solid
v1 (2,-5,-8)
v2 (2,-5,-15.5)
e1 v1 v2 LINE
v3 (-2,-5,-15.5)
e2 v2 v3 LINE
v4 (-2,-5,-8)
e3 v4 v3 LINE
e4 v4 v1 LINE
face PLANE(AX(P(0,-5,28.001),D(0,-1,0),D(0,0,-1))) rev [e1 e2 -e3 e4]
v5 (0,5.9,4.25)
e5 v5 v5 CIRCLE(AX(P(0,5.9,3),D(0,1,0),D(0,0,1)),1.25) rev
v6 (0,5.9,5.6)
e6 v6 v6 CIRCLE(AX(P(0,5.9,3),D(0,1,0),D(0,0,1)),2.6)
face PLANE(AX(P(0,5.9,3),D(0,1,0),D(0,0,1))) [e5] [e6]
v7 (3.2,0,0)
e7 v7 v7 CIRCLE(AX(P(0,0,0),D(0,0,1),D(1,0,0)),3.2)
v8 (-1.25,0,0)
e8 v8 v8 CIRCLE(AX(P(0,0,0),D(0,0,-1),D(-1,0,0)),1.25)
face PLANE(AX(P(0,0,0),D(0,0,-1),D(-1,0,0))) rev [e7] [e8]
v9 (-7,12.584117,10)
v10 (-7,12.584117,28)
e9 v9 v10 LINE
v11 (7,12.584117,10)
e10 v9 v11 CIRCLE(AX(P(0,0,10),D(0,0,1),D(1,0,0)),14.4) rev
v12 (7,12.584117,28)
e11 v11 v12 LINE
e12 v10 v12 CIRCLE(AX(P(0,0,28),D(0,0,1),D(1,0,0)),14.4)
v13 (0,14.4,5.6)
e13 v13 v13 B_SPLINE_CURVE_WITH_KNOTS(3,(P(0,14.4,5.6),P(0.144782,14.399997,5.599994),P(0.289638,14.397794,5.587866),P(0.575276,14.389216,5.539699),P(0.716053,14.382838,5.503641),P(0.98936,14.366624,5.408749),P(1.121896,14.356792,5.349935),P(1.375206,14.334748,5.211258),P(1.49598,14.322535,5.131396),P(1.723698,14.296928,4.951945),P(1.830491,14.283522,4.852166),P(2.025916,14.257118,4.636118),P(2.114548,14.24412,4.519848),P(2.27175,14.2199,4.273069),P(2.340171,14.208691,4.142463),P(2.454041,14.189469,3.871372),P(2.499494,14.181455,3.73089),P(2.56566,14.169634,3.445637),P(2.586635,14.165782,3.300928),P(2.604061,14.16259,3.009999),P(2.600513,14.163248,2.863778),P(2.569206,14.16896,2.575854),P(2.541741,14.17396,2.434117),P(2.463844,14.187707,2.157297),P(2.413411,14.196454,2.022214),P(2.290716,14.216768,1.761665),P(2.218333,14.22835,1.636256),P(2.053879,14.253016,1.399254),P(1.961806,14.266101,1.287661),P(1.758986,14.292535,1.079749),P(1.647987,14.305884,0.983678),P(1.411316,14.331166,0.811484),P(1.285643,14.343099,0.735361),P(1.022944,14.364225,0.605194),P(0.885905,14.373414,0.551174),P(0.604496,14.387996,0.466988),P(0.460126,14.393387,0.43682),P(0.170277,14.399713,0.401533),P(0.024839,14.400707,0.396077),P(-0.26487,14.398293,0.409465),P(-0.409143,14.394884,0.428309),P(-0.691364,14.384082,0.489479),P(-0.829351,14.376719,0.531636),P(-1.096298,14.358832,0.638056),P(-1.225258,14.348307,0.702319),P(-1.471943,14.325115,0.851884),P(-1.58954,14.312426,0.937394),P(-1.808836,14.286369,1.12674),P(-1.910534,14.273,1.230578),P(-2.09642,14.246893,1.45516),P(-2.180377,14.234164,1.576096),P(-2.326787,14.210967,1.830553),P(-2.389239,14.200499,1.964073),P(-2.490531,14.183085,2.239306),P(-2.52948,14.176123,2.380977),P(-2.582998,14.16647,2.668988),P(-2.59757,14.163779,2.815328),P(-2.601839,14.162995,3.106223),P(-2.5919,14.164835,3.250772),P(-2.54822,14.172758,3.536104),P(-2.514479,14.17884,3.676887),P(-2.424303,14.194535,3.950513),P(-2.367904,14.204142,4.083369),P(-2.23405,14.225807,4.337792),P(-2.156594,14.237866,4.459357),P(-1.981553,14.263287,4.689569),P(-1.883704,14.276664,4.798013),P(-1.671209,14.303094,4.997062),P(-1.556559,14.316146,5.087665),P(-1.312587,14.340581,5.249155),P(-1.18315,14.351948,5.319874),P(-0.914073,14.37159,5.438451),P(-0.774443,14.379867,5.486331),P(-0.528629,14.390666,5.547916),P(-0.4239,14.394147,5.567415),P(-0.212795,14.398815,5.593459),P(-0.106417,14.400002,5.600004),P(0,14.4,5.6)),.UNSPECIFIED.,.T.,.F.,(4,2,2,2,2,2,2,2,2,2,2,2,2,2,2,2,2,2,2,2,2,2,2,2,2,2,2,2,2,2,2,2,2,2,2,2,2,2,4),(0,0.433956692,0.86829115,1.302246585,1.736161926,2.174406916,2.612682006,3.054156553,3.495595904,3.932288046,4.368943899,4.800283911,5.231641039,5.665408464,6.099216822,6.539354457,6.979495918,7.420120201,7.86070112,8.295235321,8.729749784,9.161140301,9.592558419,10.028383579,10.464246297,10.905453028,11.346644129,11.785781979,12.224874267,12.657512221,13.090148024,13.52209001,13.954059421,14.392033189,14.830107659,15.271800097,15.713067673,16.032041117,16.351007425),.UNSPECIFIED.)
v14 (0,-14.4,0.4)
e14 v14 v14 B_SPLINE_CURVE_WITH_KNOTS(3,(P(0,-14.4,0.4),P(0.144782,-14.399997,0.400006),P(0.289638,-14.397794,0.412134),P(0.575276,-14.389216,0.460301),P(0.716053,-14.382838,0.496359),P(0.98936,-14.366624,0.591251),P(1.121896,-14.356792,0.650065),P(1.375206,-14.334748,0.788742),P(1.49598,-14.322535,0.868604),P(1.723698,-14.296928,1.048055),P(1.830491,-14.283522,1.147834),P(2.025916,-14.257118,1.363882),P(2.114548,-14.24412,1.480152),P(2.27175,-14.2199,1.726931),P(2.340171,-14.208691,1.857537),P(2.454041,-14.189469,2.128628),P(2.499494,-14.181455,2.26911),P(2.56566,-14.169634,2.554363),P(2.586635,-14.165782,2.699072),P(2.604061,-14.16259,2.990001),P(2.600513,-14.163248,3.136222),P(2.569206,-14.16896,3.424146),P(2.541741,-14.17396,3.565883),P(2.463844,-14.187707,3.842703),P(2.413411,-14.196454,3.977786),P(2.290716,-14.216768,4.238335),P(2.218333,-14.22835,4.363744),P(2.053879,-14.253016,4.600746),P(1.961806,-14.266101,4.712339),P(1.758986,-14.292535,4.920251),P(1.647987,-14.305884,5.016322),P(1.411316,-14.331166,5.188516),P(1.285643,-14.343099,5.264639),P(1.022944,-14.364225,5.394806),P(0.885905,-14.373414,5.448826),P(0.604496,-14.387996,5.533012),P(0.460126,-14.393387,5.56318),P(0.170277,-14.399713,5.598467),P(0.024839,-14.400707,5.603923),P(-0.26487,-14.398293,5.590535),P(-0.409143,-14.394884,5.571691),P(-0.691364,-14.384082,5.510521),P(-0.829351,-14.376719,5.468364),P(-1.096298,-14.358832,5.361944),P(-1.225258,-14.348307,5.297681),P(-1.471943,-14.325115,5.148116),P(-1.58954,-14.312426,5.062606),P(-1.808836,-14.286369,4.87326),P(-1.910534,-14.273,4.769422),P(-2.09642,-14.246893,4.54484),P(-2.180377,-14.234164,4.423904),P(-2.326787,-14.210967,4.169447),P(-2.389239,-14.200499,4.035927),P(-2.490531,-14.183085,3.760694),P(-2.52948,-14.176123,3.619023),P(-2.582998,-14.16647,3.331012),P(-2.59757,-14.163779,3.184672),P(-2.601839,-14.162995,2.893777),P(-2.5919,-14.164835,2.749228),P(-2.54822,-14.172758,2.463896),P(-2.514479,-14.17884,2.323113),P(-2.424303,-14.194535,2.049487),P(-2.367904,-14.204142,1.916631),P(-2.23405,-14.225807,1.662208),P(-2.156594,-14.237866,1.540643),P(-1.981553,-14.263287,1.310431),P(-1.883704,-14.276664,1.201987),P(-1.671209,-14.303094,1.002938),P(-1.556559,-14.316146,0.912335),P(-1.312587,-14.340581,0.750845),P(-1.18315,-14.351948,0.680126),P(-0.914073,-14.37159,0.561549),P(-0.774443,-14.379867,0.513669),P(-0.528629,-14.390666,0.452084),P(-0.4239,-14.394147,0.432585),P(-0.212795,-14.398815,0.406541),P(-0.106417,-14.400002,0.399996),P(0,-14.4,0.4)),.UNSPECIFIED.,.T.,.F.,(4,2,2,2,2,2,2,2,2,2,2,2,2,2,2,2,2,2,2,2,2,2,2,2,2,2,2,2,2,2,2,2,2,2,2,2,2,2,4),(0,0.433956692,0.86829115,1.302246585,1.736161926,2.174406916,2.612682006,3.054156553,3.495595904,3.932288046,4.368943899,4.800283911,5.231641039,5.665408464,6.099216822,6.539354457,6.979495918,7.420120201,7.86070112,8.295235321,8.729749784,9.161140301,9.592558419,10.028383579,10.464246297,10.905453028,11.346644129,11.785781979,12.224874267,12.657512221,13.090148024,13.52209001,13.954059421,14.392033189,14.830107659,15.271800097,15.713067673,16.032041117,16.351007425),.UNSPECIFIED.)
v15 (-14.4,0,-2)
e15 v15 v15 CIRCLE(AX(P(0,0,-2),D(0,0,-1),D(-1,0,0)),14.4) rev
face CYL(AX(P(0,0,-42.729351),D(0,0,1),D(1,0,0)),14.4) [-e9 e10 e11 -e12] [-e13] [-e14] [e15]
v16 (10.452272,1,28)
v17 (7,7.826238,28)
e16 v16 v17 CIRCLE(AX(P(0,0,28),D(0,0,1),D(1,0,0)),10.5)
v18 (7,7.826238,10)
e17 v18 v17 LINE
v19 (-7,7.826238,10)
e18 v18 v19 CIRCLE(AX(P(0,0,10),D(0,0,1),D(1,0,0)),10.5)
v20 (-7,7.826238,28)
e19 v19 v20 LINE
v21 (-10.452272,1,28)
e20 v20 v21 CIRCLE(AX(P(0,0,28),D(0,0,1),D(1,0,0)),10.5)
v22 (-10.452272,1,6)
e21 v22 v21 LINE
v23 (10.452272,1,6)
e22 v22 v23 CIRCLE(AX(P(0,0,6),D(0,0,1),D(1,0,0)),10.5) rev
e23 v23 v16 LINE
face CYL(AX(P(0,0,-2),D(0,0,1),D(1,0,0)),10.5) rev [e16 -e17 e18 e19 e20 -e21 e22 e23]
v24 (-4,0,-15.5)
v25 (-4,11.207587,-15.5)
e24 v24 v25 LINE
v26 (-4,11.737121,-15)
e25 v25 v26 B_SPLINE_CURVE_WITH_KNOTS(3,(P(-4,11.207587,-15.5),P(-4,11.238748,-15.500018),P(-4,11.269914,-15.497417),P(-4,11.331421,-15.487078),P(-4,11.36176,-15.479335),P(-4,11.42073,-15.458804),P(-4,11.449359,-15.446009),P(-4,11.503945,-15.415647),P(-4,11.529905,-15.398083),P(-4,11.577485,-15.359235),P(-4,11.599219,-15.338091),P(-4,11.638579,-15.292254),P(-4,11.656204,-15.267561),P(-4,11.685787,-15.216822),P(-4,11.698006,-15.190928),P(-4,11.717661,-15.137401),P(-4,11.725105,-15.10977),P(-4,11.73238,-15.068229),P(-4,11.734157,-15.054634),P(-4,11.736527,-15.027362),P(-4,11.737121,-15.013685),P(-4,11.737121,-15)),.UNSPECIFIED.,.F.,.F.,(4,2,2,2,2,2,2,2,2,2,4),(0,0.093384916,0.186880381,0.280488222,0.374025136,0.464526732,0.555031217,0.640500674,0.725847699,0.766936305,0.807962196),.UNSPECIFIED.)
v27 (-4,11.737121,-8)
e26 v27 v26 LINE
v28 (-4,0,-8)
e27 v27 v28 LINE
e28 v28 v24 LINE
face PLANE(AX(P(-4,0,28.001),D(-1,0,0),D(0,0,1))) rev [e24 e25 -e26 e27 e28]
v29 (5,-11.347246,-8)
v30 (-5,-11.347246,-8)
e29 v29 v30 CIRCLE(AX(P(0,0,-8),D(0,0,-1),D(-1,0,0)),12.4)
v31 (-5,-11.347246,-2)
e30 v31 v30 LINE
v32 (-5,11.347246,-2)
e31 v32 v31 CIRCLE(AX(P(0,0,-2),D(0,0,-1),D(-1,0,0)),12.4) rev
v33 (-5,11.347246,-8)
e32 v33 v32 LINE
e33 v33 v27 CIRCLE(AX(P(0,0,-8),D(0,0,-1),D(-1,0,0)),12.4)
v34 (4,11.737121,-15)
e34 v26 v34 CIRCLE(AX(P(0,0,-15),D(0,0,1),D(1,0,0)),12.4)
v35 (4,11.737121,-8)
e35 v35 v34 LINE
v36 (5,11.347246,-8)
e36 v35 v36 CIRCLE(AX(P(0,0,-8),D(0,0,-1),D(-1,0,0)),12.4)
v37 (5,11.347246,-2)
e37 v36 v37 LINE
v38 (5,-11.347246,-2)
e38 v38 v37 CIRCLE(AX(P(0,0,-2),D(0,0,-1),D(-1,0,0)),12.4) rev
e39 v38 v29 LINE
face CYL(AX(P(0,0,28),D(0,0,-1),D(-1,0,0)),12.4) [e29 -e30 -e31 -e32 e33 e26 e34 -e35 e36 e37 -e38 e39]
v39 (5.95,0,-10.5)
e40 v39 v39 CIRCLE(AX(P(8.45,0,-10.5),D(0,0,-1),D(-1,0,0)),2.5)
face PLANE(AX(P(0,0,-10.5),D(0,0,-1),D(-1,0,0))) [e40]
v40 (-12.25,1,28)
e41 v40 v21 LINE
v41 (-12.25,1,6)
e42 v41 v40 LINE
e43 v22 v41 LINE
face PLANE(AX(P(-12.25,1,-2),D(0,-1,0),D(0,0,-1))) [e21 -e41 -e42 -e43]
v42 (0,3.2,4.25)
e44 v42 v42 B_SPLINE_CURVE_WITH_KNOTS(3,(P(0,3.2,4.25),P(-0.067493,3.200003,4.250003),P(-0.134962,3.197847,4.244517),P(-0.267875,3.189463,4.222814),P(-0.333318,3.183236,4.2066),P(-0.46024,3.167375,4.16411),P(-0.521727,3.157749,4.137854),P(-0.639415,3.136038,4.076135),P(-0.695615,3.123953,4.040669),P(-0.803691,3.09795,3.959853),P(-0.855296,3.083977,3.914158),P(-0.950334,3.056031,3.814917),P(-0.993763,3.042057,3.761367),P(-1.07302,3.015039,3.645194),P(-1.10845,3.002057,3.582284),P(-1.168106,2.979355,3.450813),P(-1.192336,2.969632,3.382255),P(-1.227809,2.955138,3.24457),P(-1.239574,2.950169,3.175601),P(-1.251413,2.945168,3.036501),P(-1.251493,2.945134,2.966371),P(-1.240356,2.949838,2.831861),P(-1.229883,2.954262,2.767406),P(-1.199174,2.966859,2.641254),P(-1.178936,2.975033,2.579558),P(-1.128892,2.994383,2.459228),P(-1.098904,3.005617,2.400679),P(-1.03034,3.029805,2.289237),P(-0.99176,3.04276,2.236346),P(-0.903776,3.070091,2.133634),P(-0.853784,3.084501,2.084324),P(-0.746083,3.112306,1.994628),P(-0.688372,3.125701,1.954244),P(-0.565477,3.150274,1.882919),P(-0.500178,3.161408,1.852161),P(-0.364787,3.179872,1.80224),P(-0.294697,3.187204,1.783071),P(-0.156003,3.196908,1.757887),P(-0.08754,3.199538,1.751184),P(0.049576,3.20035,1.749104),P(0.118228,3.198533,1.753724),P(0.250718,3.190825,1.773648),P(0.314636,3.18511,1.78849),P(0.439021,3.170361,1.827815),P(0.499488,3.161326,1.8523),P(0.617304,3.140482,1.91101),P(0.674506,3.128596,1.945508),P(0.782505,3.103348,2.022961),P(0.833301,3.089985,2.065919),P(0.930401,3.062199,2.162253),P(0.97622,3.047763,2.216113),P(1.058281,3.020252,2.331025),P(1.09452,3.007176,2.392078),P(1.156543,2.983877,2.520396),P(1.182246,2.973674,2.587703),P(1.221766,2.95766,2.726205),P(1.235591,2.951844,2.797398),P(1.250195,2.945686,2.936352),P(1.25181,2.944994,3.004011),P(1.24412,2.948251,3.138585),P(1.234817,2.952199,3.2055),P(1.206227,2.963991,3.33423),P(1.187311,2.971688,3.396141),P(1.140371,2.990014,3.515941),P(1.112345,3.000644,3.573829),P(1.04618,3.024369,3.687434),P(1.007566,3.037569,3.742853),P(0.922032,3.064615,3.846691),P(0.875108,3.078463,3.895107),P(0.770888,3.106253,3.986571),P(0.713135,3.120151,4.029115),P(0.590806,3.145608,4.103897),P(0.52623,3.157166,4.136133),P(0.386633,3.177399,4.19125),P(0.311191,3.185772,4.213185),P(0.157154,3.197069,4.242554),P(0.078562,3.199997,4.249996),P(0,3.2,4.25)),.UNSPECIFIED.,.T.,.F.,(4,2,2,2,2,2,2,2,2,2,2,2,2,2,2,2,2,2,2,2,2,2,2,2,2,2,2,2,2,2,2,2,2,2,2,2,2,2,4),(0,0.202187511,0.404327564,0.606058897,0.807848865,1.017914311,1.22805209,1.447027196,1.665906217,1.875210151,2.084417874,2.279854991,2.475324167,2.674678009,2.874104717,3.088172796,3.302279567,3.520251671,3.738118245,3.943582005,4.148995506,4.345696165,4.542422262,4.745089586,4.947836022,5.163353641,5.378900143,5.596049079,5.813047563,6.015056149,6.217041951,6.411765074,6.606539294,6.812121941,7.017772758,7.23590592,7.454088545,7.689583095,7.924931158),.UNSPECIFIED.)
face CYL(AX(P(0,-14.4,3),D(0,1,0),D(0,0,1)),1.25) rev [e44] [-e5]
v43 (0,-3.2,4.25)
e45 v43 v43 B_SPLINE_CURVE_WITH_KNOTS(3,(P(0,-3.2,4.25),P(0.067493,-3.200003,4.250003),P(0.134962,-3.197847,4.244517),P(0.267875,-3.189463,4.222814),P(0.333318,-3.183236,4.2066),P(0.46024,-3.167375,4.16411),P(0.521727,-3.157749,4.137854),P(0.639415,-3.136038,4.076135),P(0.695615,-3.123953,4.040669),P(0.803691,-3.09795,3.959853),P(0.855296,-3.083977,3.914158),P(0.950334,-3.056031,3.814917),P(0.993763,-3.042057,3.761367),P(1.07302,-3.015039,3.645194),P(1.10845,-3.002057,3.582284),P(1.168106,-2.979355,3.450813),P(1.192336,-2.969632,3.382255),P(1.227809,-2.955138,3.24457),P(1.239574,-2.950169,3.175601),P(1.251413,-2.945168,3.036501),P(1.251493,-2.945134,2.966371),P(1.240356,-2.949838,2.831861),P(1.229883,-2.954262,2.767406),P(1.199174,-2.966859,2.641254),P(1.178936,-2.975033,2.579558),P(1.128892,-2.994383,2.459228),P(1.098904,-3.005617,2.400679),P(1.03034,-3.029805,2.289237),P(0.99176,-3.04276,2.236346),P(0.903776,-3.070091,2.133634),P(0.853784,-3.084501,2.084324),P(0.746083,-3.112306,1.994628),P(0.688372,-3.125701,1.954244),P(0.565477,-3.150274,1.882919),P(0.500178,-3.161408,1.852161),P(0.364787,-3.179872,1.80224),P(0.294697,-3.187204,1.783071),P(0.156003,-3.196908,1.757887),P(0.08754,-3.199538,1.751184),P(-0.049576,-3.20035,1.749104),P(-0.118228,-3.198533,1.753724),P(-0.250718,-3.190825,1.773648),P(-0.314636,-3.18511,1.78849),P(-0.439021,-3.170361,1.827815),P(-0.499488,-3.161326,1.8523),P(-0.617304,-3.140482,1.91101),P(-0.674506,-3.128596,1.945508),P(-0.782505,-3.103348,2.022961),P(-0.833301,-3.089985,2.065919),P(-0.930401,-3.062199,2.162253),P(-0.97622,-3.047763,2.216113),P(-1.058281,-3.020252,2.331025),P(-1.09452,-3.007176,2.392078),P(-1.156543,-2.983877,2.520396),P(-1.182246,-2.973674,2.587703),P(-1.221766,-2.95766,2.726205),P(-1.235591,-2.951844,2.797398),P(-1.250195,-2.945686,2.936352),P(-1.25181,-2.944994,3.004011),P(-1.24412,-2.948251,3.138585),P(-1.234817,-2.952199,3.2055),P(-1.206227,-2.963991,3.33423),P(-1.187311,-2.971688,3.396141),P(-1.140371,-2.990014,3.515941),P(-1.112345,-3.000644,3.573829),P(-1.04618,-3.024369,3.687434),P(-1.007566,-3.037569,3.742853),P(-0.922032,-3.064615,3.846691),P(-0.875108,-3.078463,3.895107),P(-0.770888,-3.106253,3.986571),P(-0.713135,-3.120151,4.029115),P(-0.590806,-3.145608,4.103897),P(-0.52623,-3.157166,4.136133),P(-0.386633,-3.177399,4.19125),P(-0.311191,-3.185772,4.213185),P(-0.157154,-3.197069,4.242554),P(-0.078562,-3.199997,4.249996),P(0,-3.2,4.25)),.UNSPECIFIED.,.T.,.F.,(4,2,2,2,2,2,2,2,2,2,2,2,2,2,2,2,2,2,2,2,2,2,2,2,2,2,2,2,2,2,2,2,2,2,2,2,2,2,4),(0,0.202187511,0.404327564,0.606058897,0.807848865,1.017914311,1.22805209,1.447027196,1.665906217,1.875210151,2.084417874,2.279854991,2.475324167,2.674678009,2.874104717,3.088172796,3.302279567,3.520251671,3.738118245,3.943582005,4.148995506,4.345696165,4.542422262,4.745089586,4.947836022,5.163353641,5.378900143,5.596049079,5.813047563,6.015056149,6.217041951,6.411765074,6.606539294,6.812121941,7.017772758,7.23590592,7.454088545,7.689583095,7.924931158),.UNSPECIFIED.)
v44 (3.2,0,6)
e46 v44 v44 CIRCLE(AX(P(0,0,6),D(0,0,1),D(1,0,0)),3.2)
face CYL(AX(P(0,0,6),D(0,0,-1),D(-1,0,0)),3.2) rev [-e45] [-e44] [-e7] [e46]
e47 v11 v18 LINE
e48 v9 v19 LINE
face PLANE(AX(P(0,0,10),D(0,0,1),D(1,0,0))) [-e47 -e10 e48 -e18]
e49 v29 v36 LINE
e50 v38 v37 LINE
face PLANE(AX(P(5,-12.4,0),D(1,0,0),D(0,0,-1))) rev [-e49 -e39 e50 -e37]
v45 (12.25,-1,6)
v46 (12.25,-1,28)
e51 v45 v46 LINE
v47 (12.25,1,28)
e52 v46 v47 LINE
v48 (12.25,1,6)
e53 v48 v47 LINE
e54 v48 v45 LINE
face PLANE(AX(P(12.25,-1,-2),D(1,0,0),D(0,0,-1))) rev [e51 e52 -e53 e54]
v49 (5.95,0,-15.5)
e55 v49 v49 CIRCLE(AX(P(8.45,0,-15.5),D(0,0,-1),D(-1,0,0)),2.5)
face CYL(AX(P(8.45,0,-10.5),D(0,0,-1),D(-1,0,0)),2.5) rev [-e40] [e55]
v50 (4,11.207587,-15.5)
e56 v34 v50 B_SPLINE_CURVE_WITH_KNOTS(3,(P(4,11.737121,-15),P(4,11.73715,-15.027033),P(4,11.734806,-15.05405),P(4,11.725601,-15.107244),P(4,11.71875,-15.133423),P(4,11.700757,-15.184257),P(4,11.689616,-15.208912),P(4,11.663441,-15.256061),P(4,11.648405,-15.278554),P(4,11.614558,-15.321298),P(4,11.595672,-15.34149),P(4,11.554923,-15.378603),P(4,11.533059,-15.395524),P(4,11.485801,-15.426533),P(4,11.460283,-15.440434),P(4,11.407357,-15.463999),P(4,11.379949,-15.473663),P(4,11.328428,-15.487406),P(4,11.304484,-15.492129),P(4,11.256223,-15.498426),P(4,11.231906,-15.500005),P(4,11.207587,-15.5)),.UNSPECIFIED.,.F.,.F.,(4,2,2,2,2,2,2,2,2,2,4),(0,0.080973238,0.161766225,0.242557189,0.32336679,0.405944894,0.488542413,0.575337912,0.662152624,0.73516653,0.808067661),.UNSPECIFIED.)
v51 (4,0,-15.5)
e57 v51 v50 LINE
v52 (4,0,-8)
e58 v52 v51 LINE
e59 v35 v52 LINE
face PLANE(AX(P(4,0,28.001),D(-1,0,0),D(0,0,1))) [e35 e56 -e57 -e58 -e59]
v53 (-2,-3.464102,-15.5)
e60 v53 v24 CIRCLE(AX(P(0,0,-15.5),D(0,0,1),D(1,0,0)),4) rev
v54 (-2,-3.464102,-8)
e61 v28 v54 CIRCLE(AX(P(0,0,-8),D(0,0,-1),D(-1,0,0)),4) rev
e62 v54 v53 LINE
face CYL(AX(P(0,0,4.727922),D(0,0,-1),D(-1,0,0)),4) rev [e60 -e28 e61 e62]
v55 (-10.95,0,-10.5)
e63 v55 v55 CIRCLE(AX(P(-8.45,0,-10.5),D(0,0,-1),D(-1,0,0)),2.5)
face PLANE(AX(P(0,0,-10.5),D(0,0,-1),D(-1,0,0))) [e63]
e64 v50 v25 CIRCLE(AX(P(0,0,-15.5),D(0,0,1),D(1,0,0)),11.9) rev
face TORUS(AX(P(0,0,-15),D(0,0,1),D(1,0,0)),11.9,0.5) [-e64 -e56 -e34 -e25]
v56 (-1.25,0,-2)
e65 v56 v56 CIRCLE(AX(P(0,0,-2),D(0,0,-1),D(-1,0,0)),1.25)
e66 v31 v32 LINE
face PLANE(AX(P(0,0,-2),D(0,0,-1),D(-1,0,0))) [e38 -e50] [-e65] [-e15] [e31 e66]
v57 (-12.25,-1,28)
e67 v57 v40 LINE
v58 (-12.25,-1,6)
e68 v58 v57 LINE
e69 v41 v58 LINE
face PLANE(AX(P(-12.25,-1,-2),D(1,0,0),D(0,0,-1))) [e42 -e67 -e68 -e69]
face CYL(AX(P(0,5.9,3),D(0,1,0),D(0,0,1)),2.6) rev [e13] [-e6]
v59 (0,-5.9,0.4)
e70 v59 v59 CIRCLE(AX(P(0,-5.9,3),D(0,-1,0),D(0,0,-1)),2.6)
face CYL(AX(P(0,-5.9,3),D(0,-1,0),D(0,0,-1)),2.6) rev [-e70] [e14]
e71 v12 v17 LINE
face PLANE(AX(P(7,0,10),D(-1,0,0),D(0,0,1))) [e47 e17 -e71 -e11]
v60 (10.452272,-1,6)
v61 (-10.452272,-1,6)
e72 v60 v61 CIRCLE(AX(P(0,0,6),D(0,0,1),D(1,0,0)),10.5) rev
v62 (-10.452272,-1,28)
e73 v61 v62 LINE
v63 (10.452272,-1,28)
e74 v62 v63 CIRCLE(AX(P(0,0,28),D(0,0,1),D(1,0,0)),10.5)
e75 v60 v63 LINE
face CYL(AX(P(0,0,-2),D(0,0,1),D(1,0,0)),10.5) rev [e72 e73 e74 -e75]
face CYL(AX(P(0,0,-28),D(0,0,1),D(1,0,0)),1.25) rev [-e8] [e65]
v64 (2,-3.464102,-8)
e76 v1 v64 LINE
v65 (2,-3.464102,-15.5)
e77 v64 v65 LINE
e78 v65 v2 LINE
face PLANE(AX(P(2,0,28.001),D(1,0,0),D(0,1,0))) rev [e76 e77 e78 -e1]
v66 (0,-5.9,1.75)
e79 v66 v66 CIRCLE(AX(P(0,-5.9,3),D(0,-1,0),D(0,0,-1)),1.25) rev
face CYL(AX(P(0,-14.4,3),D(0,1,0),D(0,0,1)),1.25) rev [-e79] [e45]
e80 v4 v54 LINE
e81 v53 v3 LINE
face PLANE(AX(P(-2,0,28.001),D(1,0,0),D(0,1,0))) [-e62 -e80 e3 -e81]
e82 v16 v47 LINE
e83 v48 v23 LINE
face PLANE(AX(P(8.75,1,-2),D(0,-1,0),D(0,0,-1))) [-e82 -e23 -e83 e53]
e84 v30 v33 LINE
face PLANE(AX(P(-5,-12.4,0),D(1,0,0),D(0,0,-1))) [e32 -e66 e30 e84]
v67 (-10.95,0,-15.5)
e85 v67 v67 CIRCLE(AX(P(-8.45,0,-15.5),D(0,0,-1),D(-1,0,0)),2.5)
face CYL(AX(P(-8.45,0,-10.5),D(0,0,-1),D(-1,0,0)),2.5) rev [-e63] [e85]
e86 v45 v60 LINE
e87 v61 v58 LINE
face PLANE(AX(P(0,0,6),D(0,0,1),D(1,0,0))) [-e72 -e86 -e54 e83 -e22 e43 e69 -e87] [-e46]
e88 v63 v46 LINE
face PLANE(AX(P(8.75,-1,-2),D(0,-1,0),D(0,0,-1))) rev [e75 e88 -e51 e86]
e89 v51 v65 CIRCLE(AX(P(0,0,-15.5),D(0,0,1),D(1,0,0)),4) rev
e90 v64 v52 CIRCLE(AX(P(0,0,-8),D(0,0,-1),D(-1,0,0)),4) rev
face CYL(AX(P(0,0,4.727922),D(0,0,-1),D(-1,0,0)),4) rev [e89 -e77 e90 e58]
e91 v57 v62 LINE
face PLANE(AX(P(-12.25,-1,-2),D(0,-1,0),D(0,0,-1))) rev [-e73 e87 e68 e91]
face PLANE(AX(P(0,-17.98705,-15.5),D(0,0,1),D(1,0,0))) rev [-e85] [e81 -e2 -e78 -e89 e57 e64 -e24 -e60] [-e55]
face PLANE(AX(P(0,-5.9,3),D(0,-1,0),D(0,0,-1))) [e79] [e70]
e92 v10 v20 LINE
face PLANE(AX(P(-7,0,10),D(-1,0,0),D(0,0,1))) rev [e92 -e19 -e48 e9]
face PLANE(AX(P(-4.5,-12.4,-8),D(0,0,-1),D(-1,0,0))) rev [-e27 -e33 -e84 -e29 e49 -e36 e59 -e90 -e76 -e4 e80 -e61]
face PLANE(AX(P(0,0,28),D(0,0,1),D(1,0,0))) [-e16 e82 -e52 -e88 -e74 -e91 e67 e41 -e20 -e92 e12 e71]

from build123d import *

# Parameters (mm, degrees)
SKETCH1_R                = 12.4
BOSS_EXTRUDE1_DEPTH      = 28
CUT_EXTRUDE1_DEPTH       = 30
SKETCH3_R                = 12.4
SKETCH3_R_2              = 3.2
BOSS_EXTRUDE2_DEPTH      = 6
CUT_EXTRUDE2_DEPTH       = 18
BOSS_EXTRUDE3_START      = 28
SKETCH5_R                = 12.4
BOSS_EXTRUDE3_DEPTH      = 28
SKETCH6_R                = 4.5
CUT_EXTRUDE3_DEPTH       = 26
CUT_EXTRUDE4_DEPTH       = 34.038159755
CUT_EXTRUDE4_DEPTH_BACK  = 34.038159755
SKETCH7_W                = 9
SKETCH7_H                = 6
CUT_EXTRUDE6_DEPTH       = 34.038159755
CUT_EXTRUDE6_DEPTH_BACK  = 34.038159755
SKETCH11_R               = 1.25
SKETCH12_R               = 4.5
SKETCH12_R_2             = 4
BOSS_EXTRUDE5_DEPTH      = 16
SKETCH13_R               = 18
SKETCH13_R_2             = 4.5
BOSS_EXTRUDE6_DEPTH      = 5
CUT_EXTRUDE7_DEPTH       = 12.5
FILLET1_R                = 0.4
CIRPATTERN1_COUNT        = 70
FILLET1_OF_CIRPATTERN1_R = 0.4
CUT_EXTRUDE10_DEPTH      = 38.835617555
CUT_EXTRUDE10_DEPTH_BACK = 38.835617555
SKETCH17_W               = 7.225305648
SKETCH17_H               = 12.5
SKETCH17_W_2             = 24.8
SKETCH17_W_3             = 7.005434177
CUT_EXTRUDE11_DEPTH      = 5
CUT_EXTRUDE12_DEPTH      = 34.038159755
CUT_EXTRUDE12_DEPTH_BACK = 34.038159755
SKETCH19_W               = 0.5
SKETCH19_H               = 6
SKETCH19_W_2             = 9
CUT_EXTRUDE13_REACH      = 48.902
BOSS_EXTRUDE7_START      = -30
BOSS_EXTRUDE7_OUTLINE_R  = 14.4
BOSS_EXTRUDE7_DEPTH      = 30
CUT_EXTRUDE14_START      = -18
CUT_EXTRUDE14_DEPTH      = 18
CUT_EXTRUDE15_DEPTH      = 35.622536013
CUT_EXTRUDE15_DEPTH_BACK = 35.622536013
SKETCH25_R               = 1.25
SKETCH26_R               = 2.6
CUT_EXTRUDE16_DEPTH      = 8.5
CUT_EXTRUDE17_START      = -8.5
SKETCH27_R               = 2.6
CUT_EXTRUDE17_DEPTH      = 8.5
FILLET2_R                = 0.5


# Read off the part's stored shape, not the designer's step: Boss-Extrude7
with BuildPart() as part:
    # Sketch1 → Boss-Extrude1 (new body)
    with BuildSketch(Plane.XY):
        Circle(SKETCH1_R)
    extrude(amount=BOSS_EXTRUDE1_DEPTH)

    # Sketch2 → Cut-Extrude1 (cut)
    with BuildSketch(Plane.XY.offset(28)):
        with BuildLine():
            ThreePointArc((10.45227248, 1), (0, 10.5), (-10.45227248, 1))
            Line((-10.45227248, 1), (-12.25, 1))
            Line((-12.25, 1), (-12.25, -1))
            Line((-12.25, -1), (-10.45227248, -1))
            ThreePointArc((-10.45227248, -1), (0, -10.5), (10.45227248, -1))
            Line((10.45227248, -1), (12.25, -1))
            Line((12.25, -1), (12.25, 1))
            Line((12.25, 1), (10.45227248, 1))
        make_face()
    extrude(amount=-CUT_EXTRUDE1_DEPTH, mode=Mode.SUBTRACT)

    # Sketch3 → Boss-Extrude2 (add)
    with BuildSketch(Plane.XY):
        Circle(SKETCH3_R)
        Circle(SKETCH3_R_2, mode=Mode.SUBTRACT)
    extrude(amount=BOSS_EXTRUDE2_DEPTH)

    # Sketch2<3> → Cut-Extrude2 (cut)
    with BuildSketch(Plane.XY.offset(28)):
        with BuildLine():
            Line((-7, 10.235233266), (-7, 7.826237921))
            ThreePointArc((-7, 7.826237921), (0, 10.5), (7, 7.826237921))
            Line((7, 7.826237921), (7, 10.235233266))
            ThreePointArc((7, 10.235233266), (0, 12.4), (-7, 10.235233266))
        make_face()
    extrude(amount=-CUT_EXTRUDE2_DEPTH, mode=Mode.SUBTRACT)

    # Sketch5 → Boss-Extrude3 (add)
    with BuildSketch(Plane(origin=(0, 0, 0), x_dir=(-1, 0, 0), z_dir=(0, 0, -1)).offset(BOSS_EXTRUDE3_START)):
        Circle(SKETCH5_R)
    extrude(amount=-BOSS_EXTRUDE3_DEPTH)

    # Sketch6 → Cut-Extrude3 (cut)
    with BuildSketch(Plane(origin=(0, 0, -28), x_dir=(-1, 0, 0), z_dir=(0, 0, -1))):
        Circle(SKETCH6_R)
    extrude(amount=-CUT_EXTRUDE3_DEPTH, mode=Mode.SUBTRACT)

    # Sketch7 → Cut-Extrude4 (cut, two sides: drawn at the far end of the back side and taken through both)
    with BuildSketch(Plane(origin=(0, 0, 0), x_dir=(1, 0, 0), z_dir=(0, 1, 0)).offset(-CUT_EXTRUDE4_DEPTH_BACK)):
        with Locations((0, 5)):
            Rectangle(SKETCH7_W, SKETCH7_H)
    extrude(amount=CUT_EXTRUDE4_DEPTH + CUT_EXTRUDE4_DEPTH_BACK, mode=Mode.SUBTRACT)

    # Sketch11 → Cut-Extrude6 (cut, two sides: drawn at the far end of the back side and taken through both)
    with BuildSketch(Plane.XY.offset(-CUT_EXTRUDE6_DEPTH_BACK)):
        with Locations(Location((0, 0, 0), (0, 0, 180))):
            Circle(SKETCH11_R)
    extrude(amount=CUT_EXTRUDE6_DEPTH + CUT_EXTRUDE6_DEPTH_BACK, mode=Mode.SUBTRACT)

    # Sketch12 → Boss-Extrude5 (add)
    with BuildSketch(Plane(origin=(0, 0, -24), x_dir=(-1, 0, 0), z_dir=(0, 0, -1))):
        Circle(SKETCH12_R)
        Circle(SKETCH12_R_2, mode=Mode.SUBTRACT)
    extrude(amount=-BOSS_EXTRUDE5_DEPTH)

    # Sketch13 → Boss-Extrude6 (add)
    with BuildSketch(Plane(origin=(0, 0, -20.5), x_dir=(-1, 0, 0), z_dir=(0, 0, -1))):
        Circle(SKETCH13_R)
        Circle(SKETCH13_R_2, mode=Mode.SUBTRACT)
    extrude(amount=-BOSS_EXTRUDE6_DEPTH)

    # Sketch14 → Cut-Extrude7 (cut)
    with BuildSketch(Plane(origin=(0, 0, -28), x_dir=(-1, 0, 0), z_dir=(0, 0, -1))):
        with BuildLine():
            ThreePointArc((0.682674344, 17.987049667), (0, 18), (-0.682674344, 17.987049667))
            ThreePointArc((-0.682674344, 17.987049667), (-0.50646239, 17.767208638), (-0.435353246, 17.494583949))
            Line((-0.435353246, 17.494583949), (-0.40730691, 16.87008376))
            ThreePointArc((-0.40730691, 16.87008376), (0, 16.875), (0.40730691, 16.87008376))
            Line((0.40730691, 16.87008376), (0.435353246, 17.494583949))
            ThreePointArc((0.435353246, 17.494583949), (0.50646239, 17.767208638), (0.682674344, 17.987049667))
        make_face()
    cut_extrude7 = extrude(amount=-CUT_EXTRUDE7_DEPTH, mode=Mode.SUBTRACT)

    # Fillet1
    fillet1_edges = [part.edges().sort_by_distance(p)[0] for p in [
        (0.40730691, 16.87008376, -18),
        (-0.40730691, 16.87008376, -18),
    ]]
    fillet(fillet1_edges, radius=FILLET1_R)

    # CirPattern1: Cut-Extrude7 ×70 about axis
    cirpattern1_axis = Axis((0, 0, 0), (0, 0, 1))
    for i in range(1, CIRPATTERN1_COUNT):
        add(cut_extrude7.rotate(cirpattern1_axis, i * 360 / CIRPATTERN1_COUNT), mode=Mode.SUBTRACT)

    # Fillet1 of CirPattern1
    fillet1_of_cirpattern1_edges = [part.edges().sort_by_distance(p)[0] for p in [
        (-1.106555437, 16.838680473, -18),
        (-1.917889861, 16.765659053, -18),
        (-2.611508451, 16.671702031, -18),
        (-3.413031091, 16.526247117, -18),
        (-4.095435134, 16.370492847, -18),
        (-4.880692602, 16.153775556, -18),
        (-5.546387781, 15.937478081, -18),
        (-6.309057646, 15.651243293, -18),
        (-6.952684176, 15.376144112, -18),
        (-7.686625867, 15.022696422, -18),
        (-8.303001645, 14.691010472, -18),
        (-9.002305896, 14.273195632, -18),
        (-9.586468227, 13.887593453, -18),
        (-10.245504651, 13.408775464, -18),
        (-10.792750204, 12.972361698, -18),
        (-11.406212627, 12.43639572, -18),
        (-11.912135302, 11.952684114, -18),
        (-12.475084486, 11.36388543, -18),
        (-12.935610891, 10.836770546, -18),
        (-13.4435143, 10.199879816, -18),
        (-13.854936547, 9.633605673, -18),
        (-14.303704842, 8.953750767, -18),
        (-14.662710401, 8.352876672, -18),
        (-15.048730362, 7.635531382, -18),
        (-15.352428732, 7.004895219, -18),
        (-15.672592354, 6.255835188, -18),
        (-15.918538334, 5.600514469, -18),
        (-16.170267848, 4.825770688, -18),
        (-16.356481225, 4.151041669, -18),
        (-16.537749853, 3.356851919, -18),
        (-16.662731347, 2.668147123, -18),
        (-16.77207962, 1.860905753, -18),
        (-16.834822953, 1.163770225, -18),
        (-16.871370464, 0.349976667, -18),
        (-16.871370464, -0.349976667, -18),
        (-16.834822953, -1.163770225, -18),
        (-16.77207962, -1.860905753, -18),
        (-16.662731347, -2.668147123, -18),
        (-16.537749853, -3.356851919, -18),
        (-16.356481225, -4.151041669, -18),
        (-16.170267848, -4.825770688, -18),
        (-15.918538334, -5.600514469, -18),
        (-15.672592354, -6.255835188, -18),
        (-15.352428732, -7.004895219, -18),
        (-15.048730362, -7.635531382, -18),
        (-14.662710401, -8.352876672, -18),
        (-14.303704842, -8.953750767, -18),
        (-13.854936547, -9.633605673, -18),
        (-13.4435143, -10.199879816, -18),
        (-12.935610891, -10.836770546, -18),
        (-12.475084486, -11.36388543, -18),
        (-11.912135302, -11.952684114, -18),
        (-11.406212627, -12.43639572, -18),
        (-10.792750204, -12.972361698, -18),
        (-10.245504651, -13.408775464, -18),
        (-9.586468227, -13.887593453, -18),
        (-9.002305896, -14.273195632, -18),
        (-8.303001645, -14.691010472, -18),
        (-7.686625867, -15.022696422, -18),
        (-6.952684176, -15.376144112, -18),
        (-6.309057646, -15.651243293, -18),
        (-5.546387781, -15.937478081, -18),
        (-4.880692602, -16.153775556, -18),
        (-4.095435134, -16.370492847, -18),
        (-3.413031091, -16.526247117, -18),
        (-2.611508451, -16.671702031, -18),
        (-1.917889861, -16.765659053, -18),
        (-1.106555437, -16.838680473, -18),
        (-0.40730691, -16.87008376, -18),
        (0.40730691, -16.87008376, -18),
        (1.106555437, -16.838680473, -18),
        (1.917889861, -16.765659053, -18),
        (2.611508451, -16.671702031, -18),
        (3.413031091, -16.526247117, -18),
        (4.095435134, -16.370492847, -18),
        (4.880692602, -16.153775556, -18),
        (5.546387781, -15.937478081, -18),
        (6.309057646, -15.651243293, -18),
        (6.952684176, -15.376144112, -18),
        (7.686625867, -15.022696422, -18),
        (8.303001645, -14.691010472, -18),
        (9.002305896, -14.273195632, -18),
        (9.586468227, -13.887593453, -18),
        (10.245504651, -13.408775464, -18),
        (10.792750204, -12.972361698, -18),
        (11.406212627, -12.43639572, -18),
        (11.912135302, -11.952684114, -18),
        (12.475084486, -11.36388543, -18),
        (12.935610891, -10.836770546, -18),
        (13.4435143, -10.199879816, -18),
        (13.854936547, -9.633605673, -18),
        (14.303704842, -8.953750767, -18),
        (14.662710401, -8.352876672, -18),
        (15.048730362, -7.635531382, -18),
        (15.352428732, -7.004895219, -18),
        (15.672592354, -6.255835188, -18),
        (15.918538334, -5.600514469, -18),
        (16.170267848, -4.825770688, -18),
        (16.356481225, -4.151041669, -18),
        (16.537749853, -3.356851919, -18),
        (16.662731347, -2.668147123, -18),
        (16.77207962, -1.860905753, -18),
        (16.834822953, -1.163770225, -18),
        (16.871370464, -0.349976667, -18),
        (16.871370464, 0.349976667, -18),
        (16.834822953, 1.163770225, -18),
        (16.77207962, 1.860905753, -18),
        (16.662731347, 2.668147123, -18),
        (16.537749853, 3.356851919, -18),
        (16.356481225, 4.151041669, -18),
        (16.170267848, 4.825770688, -18),
        (15.918538334, 5.600514469, -18),
        (15.672592354, 6.255835188, -18),
        (15.352428732, 7.004895219, -18),
        (15.048730362, 7.635531382, -18),
        (14.662710401, 8.352876672, -18),
        (14.303704842, 8.953750767, -18),
        (13.854936547, 9.633605673, -18),
        (13.4435143, 10.199879816, -18),
        (12.935610891, 10.836770546, -18),
        (12.475084486, 11.36388543, -18),
        (11.912135302, 11.952684114, -18),
        (11.406212627, 12.43639572, -18),
        (10.792750204, 12.972361698, -18),
        (10.245504651, 13.408775464, -18),
        (9.586468227, 13.887593453, -18),
        (9.002305896, 14.273195632, -18),
        (8.303001645, 14.691010472, -18),
        (7.686625867, 15.022696422, -18),
        (6.952684176, 15.376144112, -18),
        (6.309057646, 15.651243293, -18),
        (5.546387781, 15.937478081, -18),
        (4.880692602, 16.153775556, -18),
        (4.095435134, 16.370492847, -18),
        (3.413031091, 16.526247117, -18),
        (2.611508451, 16.671702031, -18),
        (1.917889861, 16.765659053, -18),
        (1.106555437, 16.838680473, -18),
    ]]
    fillet(fillet1_of_cirpattern1_edges, radius=FILLET1_OF_CIRPATTERN1_R)

    # Sketch17 → Cut-Extrude10 (cut, two sides: drawn at the far end of the back side and taken through both)
    with BuildSketch(Plane(origin=(0, 0, 0), x_dir=(1, 0, 0), z_dir=(0, 1, 0)).offset(-CUT_EXTRUDE10_DEPTH_BACK)):
        with Locations((16.012652824, 21.75)):
            Rectangle(SKETCH17_W, SKETCH17_H)
        with Locations((0, 21.75)):
            Rectangle(SKETCH17_W_2, SKETCH17_H)
        with Locations((-15.902717089, 21.75)):
            Rectangle(SKETCH17_W_3, SKETCH17_H)
    extrude(amount=CUT_EXTRUDE10_DEPTH + CUT_EXTRUDE10_DEPTH_BACK, mode=Mode.SUBTRACT)

    # Sketch18 → Cut-Extrude11 (cut)
    with BuildSketch(Plane(origin=(0, 0, -15.5), x_dir=(-1, 0, 0), z_dir=(0, 0, -1))):
        with BuildLine():
            ThreePointArc((-10.95, 0), (-8.45, -2.5), (-5.95, 0))
            Line((-5.95, 0), (-10.95, 0))
        make_face()
        with BuildLine():
            Line((-10.95, 0), (-5.95, 0))
            ThreePointArc((-5.95, 0), (-8.45, 2.5), (-10.95, 0))
        make_face()
        with BuildLine():
            ThreePointArc((10.95, 0), (8.45, 2.5), (5.95, 0))
            Line((5.95, 0), (10.95, 0))
        make_face()
        with BuildLine():
            Line((10.95, 0), (5.95, 0))
            ThreePointArc((5.95, 0), (8.45, -2.5), (10.95, 0))
        make_face()
    extrude(amount=-CUT_EXTRUDE11_DEPTH, mode=Mode.SUBTRACT)

    # Sketch19 → Cut-Extrude12 (cut, two sides: drawn at the far end of the back side and taken through both)
    with BuildSketch(Plane(origin=(0, 0, 0), x_dir=(1, 0, 0), z_dir=(0, 1, 0)).offset(-CUT_EXTRUDE12_DEPTH_BACK)):
        with Locations((4.75, 5)):
            Rectangle(SKETCH19_W, SKETCH19_H)
        with Locations((0, 5)):
            Rectangle(SKETCH19_W_2, SKETCH19_H)
        with Locations((-4.75, 5)):
            Rectangle(SKETCH19_W, SKETCH19_H)
    extrude(amount=CUT_EXTRUDE12_DEPTH + CUT_EXTRUDE12_DEPTH_BACK, mode=Mode.SUBTRACT)

    # Sketch20 → Cut-Extrude13 (cut, up to next)
    with BuildSketch(Plane(origin=(0, 0, -15.5), x_dir=(-1, 0, 0), z_dir=(0, 0, -1)), mode=Mode.PRIVATE) as cut_extrude13_sk1:
        with BuildLine():
            ThreePointArc((2, -3.464101615), (0, -4), (-2, -3.464101615))
            Line((-2, -3.464101615), (-2, -5))
            Line((-2, -5), (2, -5))
            Line((2, -5), (2, -3.464101615))
        make_face()
    cut_extrude13_tool1 = extrude(cut_extrude13_sk1.sketch, amount=-CUT_EXTRUDE13_REACH, mode=Mode.PRIVATE) & part.part
    # Sketch20 → Cut-Extrude13 (cut, up to next)
    with BuildSketch(Plane(origin=(0, 0, -15.5), x_dir=(-1, 0, 0), z_dir=(0, 0, -1)), mode=Mode.PRIVATE) as cut_extrude13_sk2:
        with BuildLine():
            Line((-2, 3.464101615), (-2, 5))
            Line((-2, 5), (2, 5))
            Line((2, 5), (2, 3.464101615))
            ThreePointArc((2, 3.464101615), (3.464101615, 2), (4, 0))
            Line((4, 0), (4, 11.737120601))
            ThreePointArc((4, 11.737120601), (0, 12.4), (-4, 11.737120601))
            Line((-4, 11.737120601), (-4, 0))
            ThreePointArc((-4, 0), (-3.464101615, 2), (-2, 3.464101615))
        make_face()
    cut_extrude13_tool2 = extrude(cut_extrude13_sk2.sketch, amount=-CUT_EXTRUDE13_REACH, mode=Mode.PRIVATE) & part.part
    # Sketch20 → Cut-Extrude13 (cut, up to next)
    with BuildSketch(Plane(origin=(0, 0, -15.5), x_dir=(-1, 0, 0), z_dir=(0, 0, -1)), mode=Mode.PRIVATE) as cut_extrude13_sk3:
        with BuildLine():
            Line((2, 5), (-2, 5))
            Line((-2, 5), (-2, 3.464101615))
            ThreePointArc((-2, 3.464101615), (0, 4), (2, 3.464101615))
            Line((2, 3.464101615), (2, 5))
        make_face()
    cut_extrude13_tool3 = extrude(cut_extrude13_sk3.sketch, amount=-CUT_EXTRUDE13_REACH, mode=Mode.PRIVATE) & part.part
    add(cut_extrude13_tool1.solids().sort_by_distance((0, -4.402581, -15.5))[0], mode=Mode.SUBTRACT)
    add(cut_extrude13_tool2.solids().sort_by_distance((0, 7.842893, -15.5))[0], mode=Mode.SUBTRACT)
    add(cut_extrude13_tool3.solids().sort_by_distance((0, 4.402581, -15.5))[0], mode=Mode.SUBTRACT)

    # Boss-Extrude7 outline → Boss-Extrude7 (add)
    with BuildSketch(Plane.XY.offset(28).offset(BOSS_EXTRUDE7_START)):
        Circle(BOSS_EXTRUDE7_OUTLINE_R)
        with BuildLine():
            ThreePointArc((-7, 10.235233266), (0, 12.4), (7, 10.235233266))
            ThreePointArc((7, 10.235233266), (0, -12.4), (-7, 10.235233266))
        make_face(mode=Mode.SUBTRACT)
    extrude(amount=BOSS_EXTRUDE7_DEPTH)

    # Sketch24 → Cut-Extrude14 (cut)
    with BuildSketch(Plane.XY.offset(28).offset(CUT_EXTRUDE14_START)):
        with BuildLine():
            ThreePointArc((-7, 10.235233266), (0, 12.4), (7, 10.235233266))
            Line((7, 10.235233266), (7, 12.584116973))
            ThreePointArc((7, 12.584116973), (0, 14.4), (-7, 12.584116973))
            Line((-7, 12.584116973), (-7, 10.235233266))
        make_face()
    extrude(amount=CUT_EXTRUDE14_DEPTH, mode=Mode.SUBTRACT)

    # Sketch25 → Cut-Extrude15 (cut, two sides: drawn at the far end of the back side and taken through both)
    with BuildSketch(Plane(origin=(0, 0, 0), x_dir=(1, 0, 0), z_dir=(0, 1, 0)).offset(-CUT_EXTRUDE15_DEPTH_BACK)):
        with Locations(Location((0, -3, 0), (0, 0, 270))):
            Circle(SKETCH25_R)
    extrude(amount=CUT_EXTRUDE15_DEPTH + CUT_EXTRUDE15_DEPTH_BACK, mode=Mode.SUBTRACT)

    # Sketch26 → Cut-Extrude16 (cut)
    with BuildSketch(Plane(origin=(0, 14.4, 0), x_dir=(1, 0, 0), z_dir=(0, 1, 0))):
        with Locations(Location((0, -3, 0), (0, 0, 270))):
            Circle(SKETCH26_R)
    extrude(amount=-CUT_EXTRUDE16_DEPTH, mode=Mode.SUBTRACT)

    # Sketch27 → Cut-Extrude17 (cut)
    with BuildSketch(Plane(origin=(0, -14.4, 0), x_dir=(-1, 0, 0), z_dir=(0, -1, 0)).offset(CUT_EXTRUDE17_START)):
        with Locations(Location((0, -3, 0), (0, 0, 270))):
            Circle(SKETCH27_R)
    extrude(amount=CUT_EXTRUDE17_DEPTH, mode=Mode.SUBTRACT)

    # Fillet2
    fillet2_edges = [part.edges().sort_by_distance(p)[0] for p in [
        (0, -12.4, -15.5),
    ]]
    fillet(fillet2_edges, radius=FILLET2_R)


solid = part.part
